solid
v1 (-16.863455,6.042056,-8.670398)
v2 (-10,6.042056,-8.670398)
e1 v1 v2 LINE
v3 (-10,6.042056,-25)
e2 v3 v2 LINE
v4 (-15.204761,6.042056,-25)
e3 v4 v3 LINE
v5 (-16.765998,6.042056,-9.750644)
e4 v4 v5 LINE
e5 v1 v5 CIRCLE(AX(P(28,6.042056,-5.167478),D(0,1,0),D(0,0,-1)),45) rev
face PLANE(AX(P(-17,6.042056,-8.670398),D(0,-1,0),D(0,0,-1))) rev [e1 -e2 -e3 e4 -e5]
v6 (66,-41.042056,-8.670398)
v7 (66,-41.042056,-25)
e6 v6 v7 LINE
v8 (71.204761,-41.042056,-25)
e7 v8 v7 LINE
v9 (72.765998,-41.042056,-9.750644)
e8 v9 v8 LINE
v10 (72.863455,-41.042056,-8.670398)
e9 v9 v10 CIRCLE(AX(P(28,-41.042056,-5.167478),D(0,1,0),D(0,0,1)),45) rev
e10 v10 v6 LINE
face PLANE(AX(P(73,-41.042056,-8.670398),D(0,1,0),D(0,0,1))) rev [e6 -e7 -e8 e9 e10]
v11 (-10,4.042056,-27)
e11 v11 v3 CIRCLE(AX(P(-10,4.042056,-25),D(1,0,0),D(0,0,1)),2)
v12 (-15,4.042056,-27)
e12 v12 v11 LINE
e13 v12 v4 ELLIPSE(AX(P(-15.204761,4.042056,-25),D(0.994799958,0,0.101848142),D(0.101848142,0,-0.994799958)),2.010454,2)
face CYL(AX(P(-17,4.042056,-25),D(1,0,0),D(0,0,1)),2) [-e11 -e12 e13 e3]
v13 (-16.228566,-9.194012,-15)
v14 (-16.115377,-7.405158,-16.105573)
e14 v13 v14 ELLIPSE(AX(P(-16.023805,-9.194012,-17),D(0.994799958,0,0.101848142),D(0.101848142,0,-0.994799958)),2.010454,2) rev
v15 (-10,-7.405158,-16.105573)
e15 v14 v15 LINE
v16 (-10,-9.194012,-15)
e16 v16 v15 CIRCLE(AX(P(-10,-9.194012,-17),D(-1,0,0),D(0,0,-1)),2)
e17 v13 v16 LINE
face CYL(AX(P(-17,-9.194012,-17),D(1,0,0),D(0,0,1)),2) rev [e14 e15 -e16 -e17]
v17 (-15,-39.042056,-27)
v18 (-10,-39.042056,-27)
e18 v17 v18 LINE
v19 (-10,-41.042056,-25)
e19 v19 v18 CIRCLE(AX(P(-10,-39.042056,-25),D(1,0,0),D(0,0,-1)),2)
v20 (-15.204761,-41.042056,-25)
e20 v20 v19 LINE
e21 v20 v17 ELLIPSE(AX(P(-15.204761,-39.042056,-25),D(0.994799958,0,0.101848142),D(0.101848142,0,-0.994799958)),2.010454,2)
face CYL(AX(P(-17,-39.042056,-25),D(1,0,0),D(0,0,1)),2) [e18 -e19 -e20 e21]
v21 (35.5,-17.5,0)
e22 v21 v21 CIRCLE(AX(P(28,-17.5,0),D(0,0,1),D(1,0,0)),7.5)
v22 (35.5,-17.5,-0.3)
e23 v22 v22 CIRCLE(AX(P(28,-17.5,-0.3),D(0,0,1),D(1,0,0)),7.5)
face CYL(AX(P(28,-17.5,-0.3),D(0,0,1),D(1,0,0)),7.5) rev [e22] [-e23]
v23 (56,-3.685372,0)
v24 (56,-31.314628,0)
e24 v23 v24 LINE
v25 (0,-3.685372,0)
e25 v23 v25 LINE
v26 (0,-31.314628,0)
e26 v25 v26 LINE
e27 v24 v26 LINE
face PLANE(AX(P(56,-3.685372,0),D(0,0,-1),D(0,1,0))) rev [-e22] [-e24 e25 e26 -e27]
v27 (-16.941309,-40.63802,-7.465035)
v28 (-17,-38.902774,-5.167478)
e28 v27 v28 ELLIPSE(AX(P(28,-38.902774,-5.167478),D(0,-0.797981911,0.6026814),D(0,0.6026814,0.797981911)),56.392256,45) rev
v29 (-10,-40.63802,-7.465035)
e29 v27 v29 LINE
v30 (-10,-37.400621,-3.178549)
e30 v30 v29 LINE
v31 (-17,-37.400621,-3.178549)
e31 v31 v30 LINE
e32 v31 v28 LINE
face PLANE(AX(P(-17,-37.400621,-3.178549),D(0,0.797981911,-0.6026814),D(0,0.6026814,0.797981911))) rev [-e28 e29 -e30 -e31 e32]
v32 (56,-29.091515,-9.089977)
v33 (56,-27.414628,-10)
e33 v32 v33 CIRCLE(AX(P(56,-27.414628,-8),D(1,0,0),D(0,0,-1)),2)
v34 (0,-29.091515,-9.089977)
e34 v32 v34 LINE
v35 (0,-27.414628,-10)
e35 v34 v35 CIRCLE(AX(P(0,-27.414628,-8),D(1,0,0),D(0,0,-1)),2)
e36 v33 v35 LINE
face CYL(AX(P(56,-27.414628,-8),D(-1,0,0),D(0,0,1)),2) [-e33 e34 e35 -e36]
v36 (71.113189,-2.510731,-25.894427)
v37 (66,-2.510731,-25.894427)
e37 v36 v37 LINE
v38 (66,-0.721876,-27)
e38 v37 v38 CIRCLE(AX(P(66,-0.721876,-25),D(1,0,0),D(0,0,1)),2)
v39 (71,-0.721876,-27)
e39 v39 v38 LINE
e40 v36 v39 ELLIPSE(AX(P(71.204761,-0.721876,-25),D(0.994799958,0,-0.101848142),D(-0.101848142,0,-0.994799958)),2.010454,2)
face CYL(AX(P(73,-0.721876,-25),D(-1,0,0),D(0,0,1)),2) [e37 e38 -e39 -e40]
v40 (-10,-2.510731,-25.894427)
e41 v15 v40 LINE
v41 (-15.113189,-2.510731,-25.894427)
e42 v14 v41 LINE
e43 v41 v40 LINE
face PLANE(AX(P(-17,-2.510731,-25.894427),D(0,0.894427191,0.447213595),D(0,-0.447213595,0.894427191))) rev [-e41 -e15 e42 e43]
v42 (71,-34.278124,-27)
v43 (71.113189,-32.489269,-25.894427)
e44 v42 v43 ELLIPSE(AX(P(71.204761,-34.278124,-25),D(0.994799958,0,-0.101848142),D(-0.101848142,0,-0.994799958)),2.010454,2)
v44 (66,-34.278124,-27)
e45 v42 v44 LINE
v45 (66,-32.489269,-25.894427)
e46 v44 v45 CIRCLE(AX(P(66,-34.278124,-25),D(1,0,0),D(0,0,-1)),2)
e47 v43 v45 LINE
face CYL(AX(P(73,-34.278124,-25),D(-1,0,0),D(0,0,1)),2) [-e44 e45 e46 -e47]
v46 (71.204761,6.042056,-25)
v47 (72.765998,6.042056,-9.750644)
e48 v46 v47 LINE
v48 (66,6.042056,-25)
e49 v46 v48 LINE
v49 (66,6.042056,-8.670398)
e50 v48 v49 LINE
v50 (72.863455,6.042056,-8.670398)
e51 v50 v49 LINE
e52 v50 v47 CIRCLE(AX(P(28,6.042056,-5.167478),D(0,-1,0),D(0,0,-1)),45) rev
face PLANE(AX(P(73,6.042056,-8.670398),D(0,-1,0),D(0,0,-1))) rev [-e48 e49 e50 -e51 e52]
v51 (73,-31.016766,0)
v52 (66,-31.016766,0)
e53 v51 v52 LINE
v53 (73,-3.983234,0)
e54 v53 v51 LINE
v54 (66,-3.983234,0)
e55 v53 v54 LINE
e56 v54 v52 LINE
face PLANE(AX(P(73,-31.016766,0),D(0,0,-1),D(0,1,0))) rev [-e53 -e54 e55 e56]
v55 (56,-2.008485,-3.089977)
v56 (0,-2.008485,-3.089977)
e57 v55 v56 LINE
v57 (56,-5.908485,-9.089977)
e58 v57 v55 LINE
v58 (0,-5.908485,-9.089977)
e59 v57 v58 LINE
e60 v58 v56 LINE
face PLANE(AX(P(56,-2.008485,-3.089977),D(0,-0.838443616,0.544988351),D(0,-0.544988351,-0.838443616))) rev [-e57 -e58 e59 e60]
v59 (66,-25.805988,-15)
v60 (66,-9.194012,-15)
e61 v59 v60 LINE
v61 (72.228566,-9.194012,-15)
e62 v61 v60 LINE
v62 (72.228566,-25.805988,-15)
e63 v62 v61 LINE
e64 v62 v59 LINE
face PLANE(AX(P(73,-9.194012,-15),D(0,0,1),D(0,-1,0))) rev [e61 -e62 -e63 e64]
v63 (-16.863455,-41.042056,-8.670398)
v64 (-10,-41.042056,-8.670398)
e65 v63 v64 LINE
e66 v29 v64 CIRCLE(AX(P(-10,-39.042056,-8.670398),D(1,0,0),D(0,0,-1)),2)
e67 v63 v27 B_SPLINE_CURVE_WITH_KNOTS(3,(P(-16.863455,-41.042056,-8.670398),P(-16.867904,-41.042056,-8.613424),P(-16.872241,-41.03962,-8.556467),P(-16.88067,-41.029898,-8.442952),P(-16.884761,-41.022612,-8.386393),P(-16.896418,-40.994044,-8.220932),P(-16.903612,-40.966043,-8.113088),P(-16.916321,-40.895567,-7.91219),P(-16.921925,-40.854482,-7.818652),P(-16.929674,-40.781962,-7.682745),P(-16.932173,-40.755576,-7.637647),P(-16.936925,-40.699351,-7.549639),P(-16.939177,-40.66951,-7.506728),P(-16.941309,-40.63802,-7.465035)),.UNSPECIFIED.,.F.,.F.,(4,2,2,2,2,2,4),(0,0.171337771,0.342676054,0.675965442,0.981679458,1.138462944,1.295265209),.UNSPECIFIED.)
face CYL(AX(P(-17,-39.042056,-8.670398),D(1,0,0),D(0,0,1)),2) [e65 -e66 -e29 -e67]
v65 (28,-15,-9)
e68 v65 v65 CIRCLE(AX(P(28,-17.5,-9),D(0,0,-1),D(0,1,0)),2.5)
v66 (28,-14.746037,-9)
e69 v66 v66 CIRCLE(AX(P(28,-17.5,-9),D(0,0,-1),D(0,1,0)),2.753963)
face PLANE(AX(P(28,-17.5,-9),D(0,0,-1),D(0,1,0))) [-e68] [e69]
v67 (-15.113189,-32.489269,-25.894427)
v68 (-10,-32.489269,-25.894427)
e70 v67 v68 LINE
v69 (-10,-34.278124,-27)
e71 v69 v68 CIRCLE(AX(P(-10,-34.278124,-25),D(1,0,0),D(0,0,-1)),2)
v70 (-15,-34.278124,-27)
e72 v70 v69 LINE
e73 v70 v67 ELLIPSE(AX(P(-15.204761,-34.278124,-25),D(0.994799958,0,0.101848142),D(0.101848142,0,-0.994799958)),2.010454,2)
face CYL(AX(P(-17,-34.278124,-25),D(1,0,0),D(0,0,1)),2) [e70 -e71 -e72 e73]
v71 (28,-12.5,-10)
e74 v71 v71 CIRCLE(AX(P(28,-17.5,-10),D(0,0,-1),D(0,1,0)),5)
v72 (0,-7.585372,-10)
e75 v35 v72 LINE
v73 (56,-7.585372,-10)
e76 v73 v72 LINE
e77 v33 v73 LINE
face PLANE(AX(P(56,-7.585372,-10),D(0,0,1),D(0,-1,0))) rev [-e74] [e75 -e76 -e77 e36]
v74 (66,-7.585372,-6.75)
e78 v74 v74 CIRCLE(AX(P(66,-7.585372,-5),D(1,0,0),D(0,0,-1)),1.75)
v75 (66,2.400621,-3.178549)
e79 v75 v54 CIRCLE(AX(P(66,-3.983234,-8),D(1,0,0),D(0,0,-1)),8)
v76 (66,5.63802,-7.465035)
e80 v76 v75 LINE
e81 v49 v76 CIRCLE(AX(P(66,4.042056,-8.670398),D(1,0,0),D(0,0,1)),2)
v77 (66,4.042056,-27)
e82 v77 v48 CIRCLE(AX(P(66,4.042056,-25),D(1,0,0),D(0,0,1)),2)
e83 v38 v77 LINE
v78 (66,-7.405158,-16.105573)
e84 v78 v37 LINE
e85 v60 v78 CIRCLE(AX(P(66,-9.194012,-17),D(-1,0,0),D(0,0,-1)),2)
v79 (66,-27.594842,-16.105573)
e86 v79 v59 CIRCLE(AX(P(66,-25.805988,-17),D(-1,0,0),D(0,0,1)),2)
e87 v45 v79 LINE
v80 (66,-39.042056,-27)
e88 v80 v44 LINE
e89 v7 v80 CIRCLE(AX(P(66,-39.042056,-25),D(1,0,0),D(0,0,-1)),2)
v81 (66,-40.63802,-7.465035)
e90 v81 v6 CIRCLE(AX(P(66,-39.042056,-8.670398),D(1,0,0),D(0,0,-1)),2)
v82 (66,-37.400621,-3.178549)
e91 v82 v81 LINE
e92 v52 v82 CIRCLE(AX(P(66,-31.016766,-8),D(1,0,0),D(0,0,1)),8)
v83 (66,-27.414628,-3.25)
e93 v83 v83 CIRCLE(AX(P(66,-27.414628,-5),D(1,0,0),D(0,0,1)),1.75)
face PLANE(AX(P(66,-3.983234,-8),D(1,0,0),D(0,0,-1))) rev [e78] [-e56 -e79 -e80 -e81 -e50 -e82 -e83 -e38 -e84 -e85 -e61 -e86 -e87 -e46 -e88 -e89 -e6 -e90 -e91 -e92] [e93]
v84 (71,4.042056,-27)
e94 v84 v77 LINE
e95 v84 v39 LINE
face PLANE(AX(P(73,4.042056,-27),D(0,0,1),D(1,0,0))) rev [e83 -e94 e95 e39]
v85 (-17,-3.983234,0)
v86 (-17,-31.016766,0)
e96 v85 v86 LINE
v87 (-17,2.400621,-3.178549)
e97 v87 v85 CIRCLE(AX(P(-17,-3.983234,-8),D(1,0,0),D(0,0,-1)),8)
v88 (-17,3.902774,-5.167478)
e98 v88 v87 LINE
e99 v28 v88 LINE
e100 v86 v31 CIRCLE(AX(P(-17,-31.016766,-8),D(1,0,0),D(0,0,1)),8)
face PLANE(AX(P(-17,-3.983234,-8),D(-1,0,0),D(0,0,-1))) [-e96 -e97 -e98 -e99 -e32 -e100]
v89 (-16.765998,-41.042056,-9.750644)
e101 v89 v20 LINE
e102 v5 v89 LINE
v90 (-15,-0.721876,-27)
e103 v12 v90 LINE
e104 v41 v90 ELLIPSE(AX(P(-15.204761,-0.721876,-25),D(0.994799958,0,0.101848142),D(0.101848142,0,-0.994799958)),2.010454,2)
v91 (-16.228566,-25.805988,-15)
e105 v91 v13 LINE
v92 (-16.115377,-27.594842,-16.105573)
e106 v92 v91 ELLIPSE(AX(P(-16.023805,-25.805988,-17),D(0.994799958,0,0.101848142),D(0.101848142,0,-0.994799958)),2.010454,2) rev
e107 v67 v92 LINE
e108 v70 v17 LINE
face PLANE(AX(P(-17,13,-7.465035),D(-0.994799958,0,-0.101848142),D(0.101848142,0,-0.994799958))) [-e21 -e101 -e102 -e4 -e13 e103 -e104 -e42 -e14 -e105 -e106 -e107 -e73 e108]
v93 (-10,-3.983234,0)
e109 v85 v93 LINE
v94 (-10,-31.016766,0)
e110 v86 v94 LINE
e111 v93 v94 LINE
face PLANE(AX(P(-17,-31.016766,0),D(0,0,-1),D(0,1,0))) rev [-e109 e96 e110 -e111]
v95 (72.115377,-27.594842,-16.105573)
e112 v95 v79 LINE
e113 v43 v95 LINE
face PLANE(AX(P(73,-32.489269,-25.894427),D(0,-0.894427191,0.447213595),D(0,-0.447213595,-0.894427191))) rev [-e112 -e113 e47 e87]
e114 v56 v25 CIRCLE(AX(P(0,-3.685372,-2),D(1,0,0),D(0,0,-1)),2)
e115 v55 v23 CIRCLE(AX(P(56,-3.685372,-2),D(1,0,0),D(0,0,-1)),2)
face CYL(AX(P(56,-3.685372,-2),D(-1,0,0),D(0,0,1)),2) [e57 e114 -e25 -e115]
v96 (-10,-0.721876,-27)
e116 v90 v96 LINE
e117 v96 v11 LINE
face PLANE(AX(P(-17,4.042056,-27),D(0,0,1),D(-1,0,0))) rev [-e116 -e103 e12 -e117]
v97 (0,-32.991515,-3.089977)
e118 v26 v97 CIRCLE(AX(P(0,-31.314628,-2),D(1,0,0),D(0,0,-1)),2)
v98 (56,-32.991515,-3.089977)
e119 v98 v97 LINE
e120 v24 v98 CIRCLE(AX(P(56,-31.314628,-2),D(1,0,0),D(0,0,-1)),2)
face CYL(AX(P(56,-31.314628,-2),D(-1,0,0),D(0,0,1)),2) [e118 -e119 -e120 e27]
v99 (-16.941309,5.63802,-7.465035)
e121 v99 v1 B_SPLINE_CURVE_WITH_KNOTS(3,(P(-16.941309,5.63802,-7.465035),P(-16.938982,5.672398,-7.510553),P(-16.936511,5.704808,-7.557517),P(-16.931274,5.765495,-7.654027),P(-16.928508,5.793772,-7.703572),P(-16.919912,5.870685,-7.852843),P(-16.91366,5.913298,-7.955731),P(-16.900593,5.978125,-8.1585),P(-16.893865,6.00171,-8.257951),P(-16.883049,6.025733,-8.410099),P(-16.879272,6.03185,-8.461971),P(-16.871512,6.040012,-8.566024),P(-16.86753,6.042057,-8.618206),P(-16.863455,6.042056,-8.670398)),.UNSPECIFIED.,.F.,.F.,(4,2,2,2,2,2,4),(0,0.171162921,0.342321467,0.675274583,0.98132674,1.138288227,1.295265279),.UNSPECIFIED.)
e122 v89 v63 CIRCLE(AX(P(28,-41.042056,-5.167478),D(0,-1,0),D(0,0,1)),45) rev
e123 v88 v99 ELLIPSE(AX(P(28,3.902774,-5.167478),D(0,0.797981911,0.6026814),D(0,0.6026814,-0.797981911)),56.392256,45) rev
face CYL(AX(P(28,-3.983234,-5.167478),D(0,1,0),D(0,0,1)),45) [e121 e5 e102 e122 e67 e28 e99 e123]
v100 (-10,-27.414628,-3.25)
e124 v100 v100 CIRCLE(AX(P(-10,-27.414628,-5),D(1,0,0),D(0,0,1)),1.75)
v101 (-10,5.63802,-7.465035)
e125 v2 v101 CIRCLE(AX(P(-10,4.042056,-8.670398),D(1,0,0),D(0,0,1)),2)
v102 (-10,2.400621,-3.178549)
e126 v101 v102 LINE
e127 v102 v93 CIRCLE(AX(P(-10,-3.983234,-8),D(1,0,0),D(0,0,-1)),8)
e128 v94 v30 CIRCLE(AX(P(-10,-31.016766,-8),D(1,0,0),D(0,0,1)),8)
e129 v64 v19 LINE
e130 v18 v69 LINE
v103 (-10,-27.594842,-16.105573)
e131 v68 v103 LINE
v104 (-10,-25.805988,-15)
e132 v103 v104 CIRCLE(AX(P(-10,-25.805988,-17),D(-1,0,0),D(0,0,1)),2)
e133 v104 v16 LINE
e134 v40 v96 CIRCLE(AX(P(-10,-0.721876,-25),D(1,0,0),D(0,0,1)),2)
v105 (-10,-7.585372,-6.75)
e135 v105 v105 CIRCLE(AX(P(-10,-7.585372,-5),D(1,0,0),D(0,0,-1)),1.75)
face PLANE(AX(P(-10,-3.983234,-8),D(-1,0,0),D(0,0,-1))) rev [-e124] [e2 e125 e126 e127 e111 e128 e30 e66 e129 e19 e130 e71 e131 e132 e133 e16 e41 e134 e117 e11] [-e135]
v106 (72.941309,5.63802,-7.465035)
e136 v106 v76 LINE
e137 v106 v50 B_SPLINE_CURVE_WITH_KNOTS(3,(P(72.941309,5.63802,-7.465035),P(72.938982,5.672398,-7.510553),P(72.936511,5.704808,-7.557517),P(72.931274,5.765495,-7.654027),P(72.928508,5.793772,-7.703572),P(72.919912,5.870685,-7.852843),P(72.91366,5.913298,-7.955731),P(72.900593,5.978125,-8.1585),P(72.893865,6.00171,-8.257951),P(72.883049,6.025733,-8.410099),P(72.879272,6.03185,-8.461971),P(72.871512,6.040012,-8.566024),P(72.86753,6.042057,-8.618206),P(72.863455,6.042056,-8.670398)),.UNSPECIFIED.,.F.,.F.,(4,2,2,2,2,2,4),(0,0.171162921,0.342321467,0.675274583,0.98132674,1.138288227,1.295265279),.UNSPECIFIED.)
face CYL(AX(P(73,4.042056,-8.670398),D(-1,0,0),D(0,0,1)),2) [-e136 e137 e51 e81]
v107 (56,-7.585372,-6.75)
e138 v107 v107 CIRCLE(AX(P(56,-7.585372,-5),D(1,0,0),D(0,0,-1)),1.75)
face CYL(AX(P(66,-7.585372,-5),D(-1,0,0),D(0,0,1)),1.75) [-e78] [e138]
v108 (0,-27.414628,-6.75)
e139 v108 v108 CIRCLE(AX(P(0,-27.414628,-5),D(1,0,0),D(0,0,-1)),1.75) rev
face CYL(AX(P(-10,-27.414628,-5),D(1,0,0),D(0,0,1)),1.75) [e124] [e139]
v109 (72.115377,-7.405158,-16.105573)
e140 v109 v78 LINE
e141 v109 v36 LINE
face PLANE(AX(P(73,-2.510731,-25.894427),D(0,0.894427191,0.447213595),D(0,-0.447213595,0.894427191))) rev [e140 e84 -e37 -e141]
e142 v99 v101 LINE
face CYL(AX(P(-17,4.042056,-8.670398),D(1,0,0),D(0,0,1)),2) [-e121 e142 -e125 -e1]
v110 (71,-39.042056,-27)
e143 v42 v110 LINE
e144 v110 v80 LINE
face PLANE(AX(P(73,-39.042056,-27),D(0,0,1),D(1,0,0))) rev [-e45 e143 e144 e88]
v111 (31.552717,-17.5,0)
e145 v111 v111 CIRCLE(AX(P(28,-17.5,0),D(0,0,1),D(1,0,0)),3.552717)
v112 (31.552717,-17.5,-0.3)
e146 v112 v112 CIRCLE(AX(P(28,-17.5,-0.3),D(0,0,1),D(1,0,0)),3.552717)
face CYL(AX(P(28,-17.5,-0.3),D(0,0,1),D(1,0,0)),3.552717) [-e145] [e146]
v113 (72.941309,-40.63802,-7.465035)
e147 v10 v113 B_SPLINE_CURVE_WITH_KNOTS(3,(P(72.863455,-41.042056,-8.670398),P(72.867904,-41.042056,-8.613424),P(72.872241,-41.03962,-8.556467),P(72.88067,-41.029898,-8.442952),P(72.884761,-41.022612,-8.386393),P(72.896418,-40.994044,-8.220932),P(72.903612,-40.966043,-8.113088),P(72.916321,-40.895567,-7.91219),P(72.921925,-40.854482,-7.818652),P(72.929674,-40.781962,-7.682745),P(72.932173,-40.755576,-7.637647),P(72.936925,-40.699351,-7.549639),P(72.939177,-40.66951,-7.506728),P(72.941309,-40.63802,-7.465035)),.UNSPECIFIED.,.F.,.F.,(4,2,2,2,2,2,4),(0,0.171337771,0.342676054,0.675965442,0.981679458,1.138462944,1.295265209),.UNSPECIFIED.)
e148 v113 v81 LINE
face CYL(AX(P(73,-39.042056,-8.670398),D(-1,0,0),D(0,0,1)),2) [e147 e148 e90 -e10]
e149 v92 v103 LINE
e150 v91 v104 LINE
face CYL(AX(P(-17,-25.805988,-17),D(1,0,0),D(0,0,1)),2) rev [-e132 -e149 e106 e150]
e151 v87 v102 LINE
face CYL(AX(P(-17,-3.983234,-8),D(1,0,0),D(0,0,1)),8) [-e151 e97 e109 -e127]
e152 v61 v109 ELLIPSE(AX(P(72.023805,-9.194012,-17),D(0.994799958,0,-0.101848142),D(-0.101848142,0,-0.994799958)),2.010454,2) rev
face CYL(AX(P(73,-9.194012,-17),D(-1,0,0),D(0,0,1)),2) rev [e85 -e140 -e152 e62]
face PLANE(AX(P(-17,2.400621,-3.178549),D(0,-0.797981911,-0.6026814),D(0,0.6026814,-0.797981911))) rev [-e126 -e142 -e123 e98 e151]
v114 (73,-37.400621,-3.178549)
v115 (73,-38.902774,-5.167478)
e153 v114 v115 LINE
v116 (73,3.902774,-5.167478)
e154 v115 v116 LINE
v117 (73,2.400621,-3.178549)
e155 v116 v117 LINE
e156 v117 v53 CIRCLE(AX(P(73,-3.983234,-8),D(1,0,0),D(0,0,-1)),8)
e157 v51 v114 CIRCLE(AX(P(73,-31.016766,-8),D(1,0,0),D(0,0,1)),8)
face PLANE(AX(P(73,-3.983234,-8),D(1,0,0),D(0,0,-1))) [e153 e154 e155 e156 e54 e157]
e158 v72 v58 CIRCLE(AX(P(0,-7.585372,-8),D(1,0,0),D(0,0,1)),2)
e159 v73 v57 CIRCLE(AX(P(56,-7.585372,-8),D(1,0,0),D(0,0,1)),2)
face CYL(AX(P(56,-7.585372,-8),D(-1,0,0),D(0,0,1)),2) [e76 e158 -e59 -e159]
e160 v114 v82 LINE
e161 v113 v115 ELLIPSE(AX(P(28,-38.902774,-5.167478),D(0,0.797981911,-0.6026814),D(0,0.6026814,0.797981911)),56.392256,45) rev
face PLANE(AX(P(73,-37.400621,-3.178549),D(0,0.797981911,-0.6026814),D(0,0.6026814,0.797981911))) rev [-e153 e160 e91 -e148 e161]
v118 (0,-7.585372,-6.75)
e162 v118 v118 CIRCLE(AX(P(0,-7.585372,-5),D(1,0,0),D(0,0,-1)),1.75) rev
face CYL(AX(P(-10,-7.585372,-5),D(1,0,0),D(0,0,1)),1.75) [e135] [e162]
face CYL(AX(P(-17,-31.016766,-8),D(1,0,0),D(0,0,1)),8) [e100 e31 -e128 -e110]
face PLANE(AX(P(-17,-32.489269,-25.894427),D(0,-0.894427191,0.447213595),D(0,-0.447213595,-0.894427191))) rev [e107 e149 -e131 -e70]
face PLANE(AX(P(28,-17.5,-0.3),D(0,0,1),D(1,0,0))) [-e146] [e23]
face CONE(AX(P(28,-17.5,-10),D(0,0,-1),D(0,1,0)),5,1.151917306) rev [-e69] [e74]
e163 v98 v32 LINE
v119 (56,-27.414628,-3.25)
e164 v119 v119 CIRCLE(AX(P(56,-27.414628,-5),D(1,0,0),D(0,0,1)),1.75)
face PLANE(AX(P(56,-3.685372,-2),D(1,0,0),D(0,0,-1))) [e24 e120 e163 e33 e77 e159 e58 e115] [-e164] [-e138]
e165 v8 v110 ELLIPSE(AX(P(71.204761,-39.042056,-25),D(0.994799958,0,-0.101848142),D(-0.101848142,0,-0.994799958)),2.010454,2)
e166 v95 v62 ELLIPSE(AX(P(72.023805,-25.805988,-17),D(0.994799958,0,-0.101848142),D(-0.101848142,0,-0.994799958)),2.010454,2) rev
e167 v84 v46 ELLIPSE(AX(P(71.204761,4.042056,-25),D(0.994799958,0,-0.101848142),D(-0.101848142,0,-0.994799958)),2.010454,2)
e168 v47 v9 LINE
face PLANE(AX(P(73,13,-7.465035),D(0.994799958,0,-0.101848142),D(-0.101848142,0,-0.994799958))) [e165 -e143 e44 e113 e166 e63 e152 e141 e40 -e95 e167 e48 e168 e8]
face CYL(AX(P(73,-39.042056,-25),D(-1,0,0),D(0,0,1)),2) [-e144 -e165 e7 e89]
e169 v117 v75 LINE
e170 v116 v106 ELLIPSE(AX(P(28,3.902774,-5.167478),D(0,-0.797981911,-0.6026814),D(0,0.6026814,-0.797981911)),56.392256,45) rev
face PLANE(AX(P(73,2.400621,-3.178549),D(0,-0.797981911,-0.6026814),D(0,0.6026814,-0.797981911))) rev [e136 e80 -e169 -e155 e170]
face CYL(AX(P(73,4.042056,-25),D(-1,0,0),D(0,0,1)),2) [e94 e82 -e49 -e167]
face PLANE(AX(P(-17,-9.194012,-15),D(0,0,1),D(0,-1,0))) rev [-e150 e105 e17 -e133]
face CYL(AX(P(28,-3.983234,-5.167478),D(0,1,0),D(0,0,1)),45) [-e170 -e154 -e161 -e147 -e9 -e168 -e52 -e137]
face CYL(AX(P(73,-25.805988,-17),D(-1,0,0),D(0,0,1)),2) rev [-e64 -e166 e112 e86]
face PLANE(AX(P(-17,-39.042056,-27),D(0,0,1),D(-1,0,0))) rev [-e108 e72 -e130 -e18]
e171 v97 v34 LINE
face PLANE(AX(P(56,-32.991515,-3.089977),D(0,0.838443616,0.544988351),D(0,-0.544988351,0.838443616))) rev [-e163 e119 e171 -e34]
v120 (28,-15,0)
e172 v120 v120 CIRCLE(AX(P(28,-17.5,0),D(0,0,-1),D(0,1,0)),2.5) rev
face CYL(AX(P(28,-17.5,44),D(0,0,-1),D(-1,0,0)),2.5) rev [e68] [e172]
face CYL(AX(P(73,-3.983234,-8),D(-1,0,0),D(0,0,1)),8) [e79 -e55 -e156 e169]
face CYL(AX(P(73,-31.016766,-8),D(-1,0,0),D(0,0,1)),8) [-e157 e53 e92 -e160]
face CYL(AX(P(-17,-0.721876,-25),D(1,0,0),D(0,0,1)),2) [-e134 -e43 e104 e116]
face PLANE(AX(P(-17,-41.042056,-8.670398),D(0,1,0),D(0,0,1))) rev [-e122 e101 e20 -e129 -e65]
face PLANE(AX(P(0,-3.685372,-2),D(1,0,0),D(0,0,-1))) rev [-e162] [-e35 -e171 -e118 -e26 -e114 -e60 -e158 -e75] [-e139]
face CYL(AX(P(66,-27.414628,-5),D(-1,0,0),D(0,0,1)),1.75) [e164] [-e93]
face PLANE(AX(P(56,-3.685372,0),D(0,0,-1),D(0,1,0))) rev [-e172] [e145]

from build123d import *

# Parameters (mm, degrees)
BOSS_EXTRUDE1_DEPTH     = 56
SKETCH2_R               = 1.75
BOSS_EXTRUDE2_DEPTH     = 10
BOSS_EXTRUDE3_DEPTH     = 7
CUT_EXTRUDE1_DEPTH      = 13
CUT_EXTRUDE1_DEPTH_BACK = 44
FILLET1_R               = 45
CUT_EXTRUDE2_DEPTH      = 44
CUT_EXTRUDE2_DEPTH_BACK = 44
SKETCH5_R               = 2.5
SKETCH6_R               = 5
CUT_EXTRUDE3_DEPTH      = 1
CUT_EXTRUDE3_DRAFT      = -66
SKETCH7_R               = 7.5
SKETCH7_R_2             = 3.552716841
CUT_EXTRUDE4_DEPTH      = 0.3


with BuildPart() as part:
    # Sketch1 → Boss-Extrude1 (new body)
    with BuildSketch(Plane(origin=(0, 0, 0), x_dir=(0, 0, -1), z_dir=(1, 0, 0))):
        with BuildLine():
            Line((3.089976701, -2.008484856), (9.089976701, -5.908484856))
            ThreePointArc((9.089976701, -5.908484856), (9.757832956, -6.631420675), (10, -7.585372088))
            Line((10, -7.585372088), (10, -27.414627912))
            ThreePointArc((10, -27.414627912), (9.757832956, -28.368579325), (9.089976701, -29.091515144))
            Line((9.089976701, -29.091515144), (3.089976701, -32.991515144))
            ThreePointArc((3.089976701, -32.991515144), (1.046048587, -33.072460868), (0, -31.314627912))
            Line((0, -31.314627912), (0, -3.685372088))
            ThreePointArc((0, -3.685372088), (1.046048587, -1.927539132), (3.089976701, -2.008484856))
        make_face()
    extrude(amount=BOSS_EXTRUDE1_DEPTH)

    # Sketch2 → Boss-Extrude2 (add)
    with BuildSketch(Plane(origin=(56, 0, 0), x_dir=(0, 0, -1), z_dir=(1, 0, 0))):
        with Locations((5, -7.585372088)):
            Circle(SKETCH2_R)
        with Locations(Location((5, -27.414627912, 0), (0, 0, 180))):
            Circle(SKETCH2_R)
    extrude(amount=BOSS_EXTRUDE2_DEPTH)

    # Sketch3 → Boss-Extrude3 (add)
    with BuildSketch(Plane(origin=(66, 0, 0), x_dir=(0, 0, -1), z_dir=(1, 0, 0))):
        with BuildLine():
            Line((25.894427191, -32.489269358), (16.105572809, -27.594842167))
            ThreePointArc((16.105572809, -27.594842167), (15.298698383, -26.857450009), (15, -25.805987785))
            Line((15, -25.805987785), (15, -9.194012215))
            ThreePointArc((15, -9.194012215), (15.298698383, -8.142549991), (16.105572809, -7.405157833))
            Line((16.105572809, -7.405157833), (25.894427191, -2.510730642))
            ThreePointArc((25.894427191, -2.510730642), (26.701301617, -1.773338484), (27, -0.72187626))
            Line((27, -0.72187626), (27, 4.042055763))
            ThreePointArc((27, 4.042055763), (26.414213562, 5.456269325), (25, 6.042055763))
            Line((25, 6.042055763), (8.670397624, 6.042055763))
            ThreePointArc((8.670397624, 6.042055763), (8.034759221, 5.938358434), (7.465034823, 5.638019584))
            Line((7.465034823, 5.638019584), (3.178548798, 2.400621135))
            ThreePointArc((3.178548798, 2.400621135), (0.838589189, -0.417537137), (0, -3.98323415))
            Line((0, -3.98323415), (0, -31.01676585))
            ThreePointArc((0, -31.01676585), (0.838589189, -34.582462863), (3.178548798, -37.400621135))
            Line((3.178548798, -37.400621135), (7.465034823, -40.638019584))
            ThreePointArc((7.465034823, -40.638019584), (8.034759221, -40.938358434), (8.670397624, -41.042055763))
            Line((8.670397624, -41.042055763), (25, -41.042055763))
            ThreePointArc((25, -41.042055763), (26.414213562, -40.456269325), (27, -39.042055763))
            Line((27, -39.042055763), (27, -34.27812374))
            ThreePointArc((27, -34.27812374), (26.701301617, -33.226661516), (25.894427191, -32.489269358))
        make_face()
    extrude(amount=BOSS_EXTRUDE3_DEPTH)

    # Sketch4 → Cut-Extrude1 (cut, two sides: drawn at the far end of the back side and taken through both)
    with BuildSketch(Plane(origin=(0, 0, 0), x_dir=(1, 0, 0), z_dir=(0, 1, 0)).offset(-CUT_EXTRUDE1_DEPTH_BACK)):
        Polygon((73, 7.465034823), (71, 27), (73.488916827, 29.217701415), (75.731950279, 28.881788193), (75.634427086, 22.987052936), (74.610433553, 7.640140994), align=None)
    extrude(amount=CUT_EXTRUDE1_DEPTH + CUT_EXTRUDE1_DEPTH_BACK, mode=Mode.SUBTRACT)

    # Fillet1
    # the kernel refuses this fillet: 45 mm, written as the material it takes off along each edge
    with BuildSketch(Plane(origin=(73, -46.381911836, -7.465034823), x_dir=(0, 0, 1), z_dir=(0, 1, 0))) as fillet1_piece_1:
        with BuildLine():
            CenterArc((FILLET1_R * 0.0510568200202, -FILLET1_R), FILLET1_R, 90, 5.845604693)
            Line((-FILLET1_R * 0.0507913223976, -FILLET1_R * 0.00520004227682), (0, 0))
            Line((0, 0), (FILLET1_R * 0.0510568200202, 0))
        make_face()
    extrude(amount=57.763823673, mode=Mode.SUBTRACT)

    # Mirror1: part across plane


with BuildPart() as part_1:
    add(part.part)
    add(part.part.mirror(Plane(origin=(28, 0, 0), x_dir=(0, 0, 1), z_dir=(1, 0, 0))))

    # Sketch5 → Cut-Extrude2 (cut, two sides: drawn at the far end of the back side and taken through both)
    with BuildSketch(Plane.XY.offset(-CUT_EXTRUDE2_DEPTH_BACK)):
        with Locations(Location((28, -17.5, 0), (0, 0, 270))):
            Circle(SKETCH5_R)
    extrude(amount=CUT_EXTRUDE2_DEPTH + CUT_EXTRUDE2_DEPTH_BACK, mode=Mode.SUBTRACT)


with BuildPart() as cut_extrude3_tool:
    # Sketch6 → Cut-Extrude3 (with draft: the straight prism first)
    with BuildSketch(Plane(origin=(0, 0, -10), x_dir=(-1, 0, 0), z_dir=(0, 0, -1))):
        with Locations((-28, -17.5)):
            Circle(SKETCH6_R)
    extrude(amount=-CUT_EXTRUDE3_DEPTH)
    # Cut-Extrude3: the draft: its side faces are tilted about the plane it starts from
    cut_extrude3_sides = [cut_extrude3_tool.faces().sort_by_distance(p)[0] for p in [
        (33, -17.5, -9.5),
    ]]
    draft(cut_extrude3_sides, Plane(origin=(0, 0, -10), x_dir=(-1, 0, 0), z_dir=(0, 0, -1)), CUT_EXTRUDE3_DRAFT)


with BuildPart() as part_2:
    add(part_1.part)

    # Cut-Extrude3: cut by cut_extrude3_tool
    add(cut_extrude3_tool.part, mode=Mode.SUBTRACT)

    # Sketch7 → Cut-Extrude4 (cut)
    with BuildSketch(Plane.XY):
        with Locations((28, -17.5)):
            Circle(SKETCH7_R)
        with Locations((28, -17.5)):
            Circle(SKETCH7_R_2, mode=Mode.SUBTRACT)
    extrude(amount=-CUT_EXTRUDE4_DEPTH, mode=Mode.SUBTRACT)


solid = part_2.part
